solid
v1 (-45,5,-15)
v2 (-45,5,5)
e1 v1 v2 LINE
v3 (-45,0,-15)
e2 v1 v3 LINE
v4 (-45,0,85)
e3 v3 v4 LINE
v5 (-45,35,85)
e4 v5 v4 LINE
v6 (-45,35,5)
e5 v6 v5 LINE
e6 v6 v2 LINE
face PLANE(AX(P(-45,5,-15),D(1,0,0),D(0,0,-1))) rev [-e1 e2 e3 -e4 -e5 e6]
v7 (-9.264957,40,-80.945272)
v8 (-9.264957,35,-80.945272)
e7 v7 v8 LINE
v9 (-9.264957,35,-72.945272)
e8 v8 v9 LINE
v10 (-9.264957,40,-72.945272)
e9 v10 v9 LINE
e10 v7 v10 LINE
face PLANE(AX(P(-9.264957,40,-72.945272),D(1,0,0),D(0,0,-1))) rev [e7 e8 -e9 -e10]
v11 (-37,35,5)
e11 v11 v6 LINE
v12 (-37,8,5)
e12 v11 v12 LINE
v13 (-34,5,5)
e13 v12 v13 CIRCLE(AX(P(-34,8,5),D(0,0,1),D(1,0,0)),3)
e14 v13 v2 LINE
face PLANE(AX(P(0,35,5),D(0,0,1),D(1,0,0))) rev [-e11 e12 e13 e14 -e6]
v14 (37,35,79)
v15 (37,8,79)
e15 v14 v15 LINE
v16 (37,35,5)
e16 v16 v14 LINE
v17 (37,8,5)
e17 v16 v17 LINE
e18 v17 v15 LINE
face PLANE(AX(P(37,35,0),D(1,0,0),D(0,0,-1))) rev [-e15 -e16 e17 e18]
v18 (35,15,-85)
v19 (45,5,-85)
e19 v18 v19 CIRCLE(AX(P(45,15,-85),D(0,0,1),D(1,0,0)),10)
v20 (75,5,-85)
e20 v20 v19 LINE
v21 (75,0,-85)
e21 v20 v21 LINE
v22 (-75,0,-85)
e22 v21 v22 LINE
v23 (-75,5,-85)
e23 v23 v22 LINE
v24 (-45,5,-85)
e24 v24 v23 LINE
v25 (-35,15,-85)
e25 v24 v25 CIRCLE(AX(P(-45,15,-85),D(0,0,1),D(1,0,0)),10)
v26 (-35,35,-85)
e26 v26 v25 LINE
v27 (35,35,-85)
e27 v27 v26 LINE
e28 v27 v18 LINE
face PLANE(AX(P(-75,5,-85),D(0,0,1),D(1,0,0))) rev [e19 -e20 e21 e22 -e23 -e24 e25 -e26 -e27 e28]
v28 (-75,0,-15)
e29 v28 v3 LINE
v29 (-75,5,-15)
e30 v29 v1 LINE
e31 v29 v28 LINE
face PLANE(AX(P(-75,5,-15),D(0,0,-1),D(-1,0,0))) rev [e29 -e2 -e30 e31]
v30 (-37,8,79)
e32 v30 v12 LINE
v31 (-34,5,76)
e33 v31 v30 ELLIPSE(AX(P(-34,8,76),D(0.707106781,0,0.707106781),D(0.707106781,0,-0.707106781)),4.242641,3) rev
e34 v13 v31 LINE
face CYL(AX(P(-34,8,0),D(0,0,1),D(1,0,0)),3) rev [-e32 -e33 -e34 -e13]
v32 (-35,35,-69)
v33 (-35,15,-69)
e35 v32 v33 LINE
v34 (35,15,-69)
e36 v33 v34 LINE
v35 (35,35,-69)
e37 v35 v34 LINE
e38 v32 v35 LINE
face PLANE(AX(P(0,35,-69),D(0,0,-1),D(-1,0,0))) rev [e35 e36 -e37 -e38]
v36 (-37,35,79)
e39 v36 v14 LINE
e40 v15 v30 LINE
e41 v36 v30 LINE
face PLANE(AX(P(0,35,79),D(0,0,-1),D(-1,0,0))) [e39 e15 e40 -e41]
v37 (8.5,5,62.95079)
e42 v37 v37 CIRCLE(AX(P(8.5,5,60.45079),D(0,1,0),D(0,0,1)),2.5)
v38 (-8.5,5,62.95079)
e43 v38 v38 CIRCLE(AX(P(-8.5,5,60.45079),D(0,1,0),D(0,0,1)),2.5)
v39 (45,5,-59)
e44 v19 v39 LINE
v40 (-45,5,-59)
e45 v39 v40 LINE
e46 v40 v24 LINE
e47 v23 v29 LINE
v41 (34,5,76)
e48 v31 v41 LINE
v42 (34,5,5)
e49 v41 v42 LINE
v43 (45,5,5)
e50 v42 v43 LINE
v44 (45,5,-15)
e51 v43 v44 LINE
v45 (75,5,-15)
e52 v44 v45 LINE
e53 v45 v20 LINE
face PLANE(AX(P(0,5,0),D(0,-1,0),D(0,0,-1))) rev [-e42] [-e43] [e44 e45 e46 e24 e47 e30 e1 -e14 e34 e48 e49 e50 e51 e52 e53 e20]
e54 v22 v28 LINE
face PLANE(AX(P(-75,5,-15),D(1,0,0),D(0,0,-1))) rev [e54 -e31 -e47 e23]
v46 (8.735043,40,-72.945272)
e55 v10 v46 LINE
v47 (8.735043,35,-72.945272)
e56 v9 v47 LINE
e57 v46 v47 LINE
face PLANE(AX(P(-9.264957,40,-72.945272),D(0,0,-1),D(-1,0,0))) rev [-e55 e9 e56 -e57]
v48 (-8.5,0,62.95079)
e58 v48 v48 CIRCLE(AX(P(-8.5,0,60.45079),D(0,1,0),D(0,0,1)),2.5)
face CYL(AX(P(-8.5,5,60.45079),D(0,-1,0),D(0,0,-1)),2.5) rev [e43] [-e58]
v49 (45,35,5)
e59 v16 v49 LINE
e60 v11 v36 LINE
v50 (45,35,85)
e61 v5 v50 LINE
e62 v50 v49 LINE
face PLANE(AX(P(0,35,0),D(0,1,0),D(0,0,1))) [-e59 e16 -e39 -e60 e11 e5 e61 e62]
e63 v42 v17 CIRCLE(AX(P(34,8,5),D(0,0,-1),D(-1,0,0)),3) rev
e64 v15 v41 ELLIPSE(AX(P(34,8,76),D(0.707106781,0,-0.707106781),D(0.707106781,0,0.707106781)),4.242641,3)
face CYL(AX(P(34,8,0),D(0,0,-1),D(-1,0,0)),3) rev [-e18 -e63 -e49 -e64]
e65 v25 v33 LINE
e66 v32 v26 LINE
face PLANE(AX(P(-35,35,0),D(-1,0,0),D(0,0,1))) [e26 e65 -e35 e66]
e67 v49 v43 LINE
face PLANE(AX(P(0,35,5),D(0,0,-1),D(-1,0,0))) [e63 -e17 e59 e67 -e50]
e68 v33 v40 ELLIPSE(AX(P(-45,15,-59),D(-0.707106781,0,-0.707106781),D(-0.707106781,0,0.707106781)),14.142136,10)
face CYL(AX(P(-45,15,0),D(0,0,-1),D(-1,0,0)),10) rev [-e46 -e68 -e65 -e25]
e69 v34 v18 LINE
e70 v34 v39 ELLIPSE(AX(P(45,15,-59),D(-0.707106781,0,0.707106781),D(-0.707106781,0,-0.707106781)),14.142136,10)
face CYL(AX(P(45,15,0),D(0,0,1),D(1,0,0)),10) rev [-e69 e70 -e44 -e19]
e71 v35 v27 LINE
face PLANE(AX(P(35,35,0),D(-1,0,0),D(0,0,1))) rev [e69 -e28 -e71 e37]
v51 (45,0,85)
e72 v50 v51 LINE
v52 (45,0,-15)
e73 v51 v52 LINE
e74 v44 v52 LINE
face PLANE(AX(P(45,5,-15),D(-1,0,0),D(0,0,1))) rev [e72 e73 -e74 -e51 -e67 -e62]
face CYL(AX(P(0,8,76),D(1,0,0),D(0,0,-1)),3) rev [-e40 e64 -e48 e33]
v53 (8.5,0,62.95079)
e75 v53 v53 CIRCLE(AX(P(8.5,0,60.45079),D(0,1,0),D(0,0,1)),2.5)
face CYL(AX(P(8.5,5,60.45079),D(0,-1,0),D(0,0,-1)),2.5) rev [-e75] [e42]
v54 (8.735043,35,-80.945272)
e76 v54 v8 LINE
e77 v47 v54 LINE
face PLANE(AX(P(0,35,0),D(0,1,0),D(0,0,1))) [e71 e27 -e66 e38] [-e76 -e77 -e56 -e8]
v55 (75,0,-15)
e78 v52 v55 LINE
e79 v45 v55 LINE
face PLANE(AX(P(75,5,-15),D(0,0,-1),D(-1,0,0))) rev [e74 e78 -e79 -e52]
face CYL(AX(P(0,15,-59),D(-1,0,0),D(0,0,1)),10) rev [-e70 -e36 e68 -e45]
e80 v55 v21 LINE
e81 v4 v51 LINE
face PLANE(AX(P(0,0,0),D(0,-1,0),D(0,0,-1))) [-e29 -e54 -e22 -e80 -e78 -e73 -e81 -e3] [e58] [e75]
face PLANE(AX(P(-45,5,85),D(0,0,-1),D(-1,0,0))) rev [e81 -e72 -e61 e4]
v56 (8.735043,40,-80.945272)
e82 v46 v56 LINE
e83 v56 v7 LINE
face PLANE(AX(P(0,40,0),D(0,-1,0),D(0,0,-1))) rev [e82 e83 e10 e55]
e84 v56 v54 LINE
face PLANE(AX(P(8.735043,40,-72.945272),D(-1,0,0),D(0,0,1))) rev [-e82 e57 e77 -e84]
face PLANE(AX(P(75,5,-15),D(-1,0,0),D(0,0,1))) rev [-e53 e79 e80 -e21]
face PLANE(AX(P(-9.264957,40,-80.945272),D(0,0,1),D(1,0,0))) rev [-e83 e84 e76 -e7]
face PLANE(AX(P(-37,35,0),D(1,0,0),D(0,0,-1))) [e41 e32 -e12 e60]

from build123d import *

# Parameters (mm, degrees)
SKETCH1_R           = 2.5
BOSS_EXTRUDE1_DEPTH = 5
SKETCH2_W           = 70
SKETCH2_H           = 16
BOSS_EXTRUDE2_DEPTH = 30
FILLET1_R           = 10
FILLET2_R           = 3
SKETCH9_W           = 18
SKETCH9_H           = 8
BOSS_EXTRUDE9_DEPTH = 5


with BuildPart() as part:
    # Sketch1 → Boss-Extrude1 (new body)
    with BuildSketch(Plane(origin=(0, 0, 0), x_dir=(1, 0, 0), z_dir=(0, 1, 0))):
        Polygon((-45, -85), (45, -85), (45, 15), (75, 15), (75, 85), (-75, 85), (-75, 15), (-45, 15), align=None)
        with Locations((-8.5, -60.45079013)):
            Circle(SKETCH1_R, mode=Mode.SUBTRACT)
        with Locations((8.5, -60.45079013)):
            Circle(SKETCH1_R, mode=Mode.SUBTRACT)
    extrude(amount=BOSS_EXTRUDE1_DEPTH)

    # Sketch2 → Boss-Extrude2 (add)
    with BuildSketch(Plane(origin=(0, 5, 0), x_dir=(1, 0, 0), z_dir=(0, 1, 0))):
        with Locations((0, 77)):
            Rectangle(SKETCH2_W, SKETCH2_H)
        Polygon((-45, -85), (45, -85), (45, -5), (37, -5), (37, -79), (-37, -79), (-37, -5), (-45, -5), align=None)
    extrude(amount=BOSS_EXTRUDE2_DEPTH)

    # Fillet1
    fillet1_edges = [part.edges().sort_by_distance(p)[0] for p in [
        (0, 5, -69),
        (35, 5, -77),
        (-35, 5, -77),
    ]]
    fillet(fillet1_edges, radius=FILLET1_R)

    # Fillet2
    fillet2_edges = [part.edges().sort_by_distance(p)[0] for p in [
        (0, 5, 79),
        (-37, 5, 42),
        (37, 5, 42),
    ]]
    fillet(fillet2_edges, radius=FILLET2_R)

    # Sketch9 → Boss-Extrude9 (add)
    with BuildSketch(Plane(origin=(0, 35, 0), x_dir=(1, 0, 0), z_dir=(0, 1, 0))):
        with Locations((-0.264957407, 76.945272118)):
            Rectangle(SKETCH9_W, SKETCH9_H)
    extrude(amount=BOSS_EXTRUDE9_DEPTH)


solid = part.part
